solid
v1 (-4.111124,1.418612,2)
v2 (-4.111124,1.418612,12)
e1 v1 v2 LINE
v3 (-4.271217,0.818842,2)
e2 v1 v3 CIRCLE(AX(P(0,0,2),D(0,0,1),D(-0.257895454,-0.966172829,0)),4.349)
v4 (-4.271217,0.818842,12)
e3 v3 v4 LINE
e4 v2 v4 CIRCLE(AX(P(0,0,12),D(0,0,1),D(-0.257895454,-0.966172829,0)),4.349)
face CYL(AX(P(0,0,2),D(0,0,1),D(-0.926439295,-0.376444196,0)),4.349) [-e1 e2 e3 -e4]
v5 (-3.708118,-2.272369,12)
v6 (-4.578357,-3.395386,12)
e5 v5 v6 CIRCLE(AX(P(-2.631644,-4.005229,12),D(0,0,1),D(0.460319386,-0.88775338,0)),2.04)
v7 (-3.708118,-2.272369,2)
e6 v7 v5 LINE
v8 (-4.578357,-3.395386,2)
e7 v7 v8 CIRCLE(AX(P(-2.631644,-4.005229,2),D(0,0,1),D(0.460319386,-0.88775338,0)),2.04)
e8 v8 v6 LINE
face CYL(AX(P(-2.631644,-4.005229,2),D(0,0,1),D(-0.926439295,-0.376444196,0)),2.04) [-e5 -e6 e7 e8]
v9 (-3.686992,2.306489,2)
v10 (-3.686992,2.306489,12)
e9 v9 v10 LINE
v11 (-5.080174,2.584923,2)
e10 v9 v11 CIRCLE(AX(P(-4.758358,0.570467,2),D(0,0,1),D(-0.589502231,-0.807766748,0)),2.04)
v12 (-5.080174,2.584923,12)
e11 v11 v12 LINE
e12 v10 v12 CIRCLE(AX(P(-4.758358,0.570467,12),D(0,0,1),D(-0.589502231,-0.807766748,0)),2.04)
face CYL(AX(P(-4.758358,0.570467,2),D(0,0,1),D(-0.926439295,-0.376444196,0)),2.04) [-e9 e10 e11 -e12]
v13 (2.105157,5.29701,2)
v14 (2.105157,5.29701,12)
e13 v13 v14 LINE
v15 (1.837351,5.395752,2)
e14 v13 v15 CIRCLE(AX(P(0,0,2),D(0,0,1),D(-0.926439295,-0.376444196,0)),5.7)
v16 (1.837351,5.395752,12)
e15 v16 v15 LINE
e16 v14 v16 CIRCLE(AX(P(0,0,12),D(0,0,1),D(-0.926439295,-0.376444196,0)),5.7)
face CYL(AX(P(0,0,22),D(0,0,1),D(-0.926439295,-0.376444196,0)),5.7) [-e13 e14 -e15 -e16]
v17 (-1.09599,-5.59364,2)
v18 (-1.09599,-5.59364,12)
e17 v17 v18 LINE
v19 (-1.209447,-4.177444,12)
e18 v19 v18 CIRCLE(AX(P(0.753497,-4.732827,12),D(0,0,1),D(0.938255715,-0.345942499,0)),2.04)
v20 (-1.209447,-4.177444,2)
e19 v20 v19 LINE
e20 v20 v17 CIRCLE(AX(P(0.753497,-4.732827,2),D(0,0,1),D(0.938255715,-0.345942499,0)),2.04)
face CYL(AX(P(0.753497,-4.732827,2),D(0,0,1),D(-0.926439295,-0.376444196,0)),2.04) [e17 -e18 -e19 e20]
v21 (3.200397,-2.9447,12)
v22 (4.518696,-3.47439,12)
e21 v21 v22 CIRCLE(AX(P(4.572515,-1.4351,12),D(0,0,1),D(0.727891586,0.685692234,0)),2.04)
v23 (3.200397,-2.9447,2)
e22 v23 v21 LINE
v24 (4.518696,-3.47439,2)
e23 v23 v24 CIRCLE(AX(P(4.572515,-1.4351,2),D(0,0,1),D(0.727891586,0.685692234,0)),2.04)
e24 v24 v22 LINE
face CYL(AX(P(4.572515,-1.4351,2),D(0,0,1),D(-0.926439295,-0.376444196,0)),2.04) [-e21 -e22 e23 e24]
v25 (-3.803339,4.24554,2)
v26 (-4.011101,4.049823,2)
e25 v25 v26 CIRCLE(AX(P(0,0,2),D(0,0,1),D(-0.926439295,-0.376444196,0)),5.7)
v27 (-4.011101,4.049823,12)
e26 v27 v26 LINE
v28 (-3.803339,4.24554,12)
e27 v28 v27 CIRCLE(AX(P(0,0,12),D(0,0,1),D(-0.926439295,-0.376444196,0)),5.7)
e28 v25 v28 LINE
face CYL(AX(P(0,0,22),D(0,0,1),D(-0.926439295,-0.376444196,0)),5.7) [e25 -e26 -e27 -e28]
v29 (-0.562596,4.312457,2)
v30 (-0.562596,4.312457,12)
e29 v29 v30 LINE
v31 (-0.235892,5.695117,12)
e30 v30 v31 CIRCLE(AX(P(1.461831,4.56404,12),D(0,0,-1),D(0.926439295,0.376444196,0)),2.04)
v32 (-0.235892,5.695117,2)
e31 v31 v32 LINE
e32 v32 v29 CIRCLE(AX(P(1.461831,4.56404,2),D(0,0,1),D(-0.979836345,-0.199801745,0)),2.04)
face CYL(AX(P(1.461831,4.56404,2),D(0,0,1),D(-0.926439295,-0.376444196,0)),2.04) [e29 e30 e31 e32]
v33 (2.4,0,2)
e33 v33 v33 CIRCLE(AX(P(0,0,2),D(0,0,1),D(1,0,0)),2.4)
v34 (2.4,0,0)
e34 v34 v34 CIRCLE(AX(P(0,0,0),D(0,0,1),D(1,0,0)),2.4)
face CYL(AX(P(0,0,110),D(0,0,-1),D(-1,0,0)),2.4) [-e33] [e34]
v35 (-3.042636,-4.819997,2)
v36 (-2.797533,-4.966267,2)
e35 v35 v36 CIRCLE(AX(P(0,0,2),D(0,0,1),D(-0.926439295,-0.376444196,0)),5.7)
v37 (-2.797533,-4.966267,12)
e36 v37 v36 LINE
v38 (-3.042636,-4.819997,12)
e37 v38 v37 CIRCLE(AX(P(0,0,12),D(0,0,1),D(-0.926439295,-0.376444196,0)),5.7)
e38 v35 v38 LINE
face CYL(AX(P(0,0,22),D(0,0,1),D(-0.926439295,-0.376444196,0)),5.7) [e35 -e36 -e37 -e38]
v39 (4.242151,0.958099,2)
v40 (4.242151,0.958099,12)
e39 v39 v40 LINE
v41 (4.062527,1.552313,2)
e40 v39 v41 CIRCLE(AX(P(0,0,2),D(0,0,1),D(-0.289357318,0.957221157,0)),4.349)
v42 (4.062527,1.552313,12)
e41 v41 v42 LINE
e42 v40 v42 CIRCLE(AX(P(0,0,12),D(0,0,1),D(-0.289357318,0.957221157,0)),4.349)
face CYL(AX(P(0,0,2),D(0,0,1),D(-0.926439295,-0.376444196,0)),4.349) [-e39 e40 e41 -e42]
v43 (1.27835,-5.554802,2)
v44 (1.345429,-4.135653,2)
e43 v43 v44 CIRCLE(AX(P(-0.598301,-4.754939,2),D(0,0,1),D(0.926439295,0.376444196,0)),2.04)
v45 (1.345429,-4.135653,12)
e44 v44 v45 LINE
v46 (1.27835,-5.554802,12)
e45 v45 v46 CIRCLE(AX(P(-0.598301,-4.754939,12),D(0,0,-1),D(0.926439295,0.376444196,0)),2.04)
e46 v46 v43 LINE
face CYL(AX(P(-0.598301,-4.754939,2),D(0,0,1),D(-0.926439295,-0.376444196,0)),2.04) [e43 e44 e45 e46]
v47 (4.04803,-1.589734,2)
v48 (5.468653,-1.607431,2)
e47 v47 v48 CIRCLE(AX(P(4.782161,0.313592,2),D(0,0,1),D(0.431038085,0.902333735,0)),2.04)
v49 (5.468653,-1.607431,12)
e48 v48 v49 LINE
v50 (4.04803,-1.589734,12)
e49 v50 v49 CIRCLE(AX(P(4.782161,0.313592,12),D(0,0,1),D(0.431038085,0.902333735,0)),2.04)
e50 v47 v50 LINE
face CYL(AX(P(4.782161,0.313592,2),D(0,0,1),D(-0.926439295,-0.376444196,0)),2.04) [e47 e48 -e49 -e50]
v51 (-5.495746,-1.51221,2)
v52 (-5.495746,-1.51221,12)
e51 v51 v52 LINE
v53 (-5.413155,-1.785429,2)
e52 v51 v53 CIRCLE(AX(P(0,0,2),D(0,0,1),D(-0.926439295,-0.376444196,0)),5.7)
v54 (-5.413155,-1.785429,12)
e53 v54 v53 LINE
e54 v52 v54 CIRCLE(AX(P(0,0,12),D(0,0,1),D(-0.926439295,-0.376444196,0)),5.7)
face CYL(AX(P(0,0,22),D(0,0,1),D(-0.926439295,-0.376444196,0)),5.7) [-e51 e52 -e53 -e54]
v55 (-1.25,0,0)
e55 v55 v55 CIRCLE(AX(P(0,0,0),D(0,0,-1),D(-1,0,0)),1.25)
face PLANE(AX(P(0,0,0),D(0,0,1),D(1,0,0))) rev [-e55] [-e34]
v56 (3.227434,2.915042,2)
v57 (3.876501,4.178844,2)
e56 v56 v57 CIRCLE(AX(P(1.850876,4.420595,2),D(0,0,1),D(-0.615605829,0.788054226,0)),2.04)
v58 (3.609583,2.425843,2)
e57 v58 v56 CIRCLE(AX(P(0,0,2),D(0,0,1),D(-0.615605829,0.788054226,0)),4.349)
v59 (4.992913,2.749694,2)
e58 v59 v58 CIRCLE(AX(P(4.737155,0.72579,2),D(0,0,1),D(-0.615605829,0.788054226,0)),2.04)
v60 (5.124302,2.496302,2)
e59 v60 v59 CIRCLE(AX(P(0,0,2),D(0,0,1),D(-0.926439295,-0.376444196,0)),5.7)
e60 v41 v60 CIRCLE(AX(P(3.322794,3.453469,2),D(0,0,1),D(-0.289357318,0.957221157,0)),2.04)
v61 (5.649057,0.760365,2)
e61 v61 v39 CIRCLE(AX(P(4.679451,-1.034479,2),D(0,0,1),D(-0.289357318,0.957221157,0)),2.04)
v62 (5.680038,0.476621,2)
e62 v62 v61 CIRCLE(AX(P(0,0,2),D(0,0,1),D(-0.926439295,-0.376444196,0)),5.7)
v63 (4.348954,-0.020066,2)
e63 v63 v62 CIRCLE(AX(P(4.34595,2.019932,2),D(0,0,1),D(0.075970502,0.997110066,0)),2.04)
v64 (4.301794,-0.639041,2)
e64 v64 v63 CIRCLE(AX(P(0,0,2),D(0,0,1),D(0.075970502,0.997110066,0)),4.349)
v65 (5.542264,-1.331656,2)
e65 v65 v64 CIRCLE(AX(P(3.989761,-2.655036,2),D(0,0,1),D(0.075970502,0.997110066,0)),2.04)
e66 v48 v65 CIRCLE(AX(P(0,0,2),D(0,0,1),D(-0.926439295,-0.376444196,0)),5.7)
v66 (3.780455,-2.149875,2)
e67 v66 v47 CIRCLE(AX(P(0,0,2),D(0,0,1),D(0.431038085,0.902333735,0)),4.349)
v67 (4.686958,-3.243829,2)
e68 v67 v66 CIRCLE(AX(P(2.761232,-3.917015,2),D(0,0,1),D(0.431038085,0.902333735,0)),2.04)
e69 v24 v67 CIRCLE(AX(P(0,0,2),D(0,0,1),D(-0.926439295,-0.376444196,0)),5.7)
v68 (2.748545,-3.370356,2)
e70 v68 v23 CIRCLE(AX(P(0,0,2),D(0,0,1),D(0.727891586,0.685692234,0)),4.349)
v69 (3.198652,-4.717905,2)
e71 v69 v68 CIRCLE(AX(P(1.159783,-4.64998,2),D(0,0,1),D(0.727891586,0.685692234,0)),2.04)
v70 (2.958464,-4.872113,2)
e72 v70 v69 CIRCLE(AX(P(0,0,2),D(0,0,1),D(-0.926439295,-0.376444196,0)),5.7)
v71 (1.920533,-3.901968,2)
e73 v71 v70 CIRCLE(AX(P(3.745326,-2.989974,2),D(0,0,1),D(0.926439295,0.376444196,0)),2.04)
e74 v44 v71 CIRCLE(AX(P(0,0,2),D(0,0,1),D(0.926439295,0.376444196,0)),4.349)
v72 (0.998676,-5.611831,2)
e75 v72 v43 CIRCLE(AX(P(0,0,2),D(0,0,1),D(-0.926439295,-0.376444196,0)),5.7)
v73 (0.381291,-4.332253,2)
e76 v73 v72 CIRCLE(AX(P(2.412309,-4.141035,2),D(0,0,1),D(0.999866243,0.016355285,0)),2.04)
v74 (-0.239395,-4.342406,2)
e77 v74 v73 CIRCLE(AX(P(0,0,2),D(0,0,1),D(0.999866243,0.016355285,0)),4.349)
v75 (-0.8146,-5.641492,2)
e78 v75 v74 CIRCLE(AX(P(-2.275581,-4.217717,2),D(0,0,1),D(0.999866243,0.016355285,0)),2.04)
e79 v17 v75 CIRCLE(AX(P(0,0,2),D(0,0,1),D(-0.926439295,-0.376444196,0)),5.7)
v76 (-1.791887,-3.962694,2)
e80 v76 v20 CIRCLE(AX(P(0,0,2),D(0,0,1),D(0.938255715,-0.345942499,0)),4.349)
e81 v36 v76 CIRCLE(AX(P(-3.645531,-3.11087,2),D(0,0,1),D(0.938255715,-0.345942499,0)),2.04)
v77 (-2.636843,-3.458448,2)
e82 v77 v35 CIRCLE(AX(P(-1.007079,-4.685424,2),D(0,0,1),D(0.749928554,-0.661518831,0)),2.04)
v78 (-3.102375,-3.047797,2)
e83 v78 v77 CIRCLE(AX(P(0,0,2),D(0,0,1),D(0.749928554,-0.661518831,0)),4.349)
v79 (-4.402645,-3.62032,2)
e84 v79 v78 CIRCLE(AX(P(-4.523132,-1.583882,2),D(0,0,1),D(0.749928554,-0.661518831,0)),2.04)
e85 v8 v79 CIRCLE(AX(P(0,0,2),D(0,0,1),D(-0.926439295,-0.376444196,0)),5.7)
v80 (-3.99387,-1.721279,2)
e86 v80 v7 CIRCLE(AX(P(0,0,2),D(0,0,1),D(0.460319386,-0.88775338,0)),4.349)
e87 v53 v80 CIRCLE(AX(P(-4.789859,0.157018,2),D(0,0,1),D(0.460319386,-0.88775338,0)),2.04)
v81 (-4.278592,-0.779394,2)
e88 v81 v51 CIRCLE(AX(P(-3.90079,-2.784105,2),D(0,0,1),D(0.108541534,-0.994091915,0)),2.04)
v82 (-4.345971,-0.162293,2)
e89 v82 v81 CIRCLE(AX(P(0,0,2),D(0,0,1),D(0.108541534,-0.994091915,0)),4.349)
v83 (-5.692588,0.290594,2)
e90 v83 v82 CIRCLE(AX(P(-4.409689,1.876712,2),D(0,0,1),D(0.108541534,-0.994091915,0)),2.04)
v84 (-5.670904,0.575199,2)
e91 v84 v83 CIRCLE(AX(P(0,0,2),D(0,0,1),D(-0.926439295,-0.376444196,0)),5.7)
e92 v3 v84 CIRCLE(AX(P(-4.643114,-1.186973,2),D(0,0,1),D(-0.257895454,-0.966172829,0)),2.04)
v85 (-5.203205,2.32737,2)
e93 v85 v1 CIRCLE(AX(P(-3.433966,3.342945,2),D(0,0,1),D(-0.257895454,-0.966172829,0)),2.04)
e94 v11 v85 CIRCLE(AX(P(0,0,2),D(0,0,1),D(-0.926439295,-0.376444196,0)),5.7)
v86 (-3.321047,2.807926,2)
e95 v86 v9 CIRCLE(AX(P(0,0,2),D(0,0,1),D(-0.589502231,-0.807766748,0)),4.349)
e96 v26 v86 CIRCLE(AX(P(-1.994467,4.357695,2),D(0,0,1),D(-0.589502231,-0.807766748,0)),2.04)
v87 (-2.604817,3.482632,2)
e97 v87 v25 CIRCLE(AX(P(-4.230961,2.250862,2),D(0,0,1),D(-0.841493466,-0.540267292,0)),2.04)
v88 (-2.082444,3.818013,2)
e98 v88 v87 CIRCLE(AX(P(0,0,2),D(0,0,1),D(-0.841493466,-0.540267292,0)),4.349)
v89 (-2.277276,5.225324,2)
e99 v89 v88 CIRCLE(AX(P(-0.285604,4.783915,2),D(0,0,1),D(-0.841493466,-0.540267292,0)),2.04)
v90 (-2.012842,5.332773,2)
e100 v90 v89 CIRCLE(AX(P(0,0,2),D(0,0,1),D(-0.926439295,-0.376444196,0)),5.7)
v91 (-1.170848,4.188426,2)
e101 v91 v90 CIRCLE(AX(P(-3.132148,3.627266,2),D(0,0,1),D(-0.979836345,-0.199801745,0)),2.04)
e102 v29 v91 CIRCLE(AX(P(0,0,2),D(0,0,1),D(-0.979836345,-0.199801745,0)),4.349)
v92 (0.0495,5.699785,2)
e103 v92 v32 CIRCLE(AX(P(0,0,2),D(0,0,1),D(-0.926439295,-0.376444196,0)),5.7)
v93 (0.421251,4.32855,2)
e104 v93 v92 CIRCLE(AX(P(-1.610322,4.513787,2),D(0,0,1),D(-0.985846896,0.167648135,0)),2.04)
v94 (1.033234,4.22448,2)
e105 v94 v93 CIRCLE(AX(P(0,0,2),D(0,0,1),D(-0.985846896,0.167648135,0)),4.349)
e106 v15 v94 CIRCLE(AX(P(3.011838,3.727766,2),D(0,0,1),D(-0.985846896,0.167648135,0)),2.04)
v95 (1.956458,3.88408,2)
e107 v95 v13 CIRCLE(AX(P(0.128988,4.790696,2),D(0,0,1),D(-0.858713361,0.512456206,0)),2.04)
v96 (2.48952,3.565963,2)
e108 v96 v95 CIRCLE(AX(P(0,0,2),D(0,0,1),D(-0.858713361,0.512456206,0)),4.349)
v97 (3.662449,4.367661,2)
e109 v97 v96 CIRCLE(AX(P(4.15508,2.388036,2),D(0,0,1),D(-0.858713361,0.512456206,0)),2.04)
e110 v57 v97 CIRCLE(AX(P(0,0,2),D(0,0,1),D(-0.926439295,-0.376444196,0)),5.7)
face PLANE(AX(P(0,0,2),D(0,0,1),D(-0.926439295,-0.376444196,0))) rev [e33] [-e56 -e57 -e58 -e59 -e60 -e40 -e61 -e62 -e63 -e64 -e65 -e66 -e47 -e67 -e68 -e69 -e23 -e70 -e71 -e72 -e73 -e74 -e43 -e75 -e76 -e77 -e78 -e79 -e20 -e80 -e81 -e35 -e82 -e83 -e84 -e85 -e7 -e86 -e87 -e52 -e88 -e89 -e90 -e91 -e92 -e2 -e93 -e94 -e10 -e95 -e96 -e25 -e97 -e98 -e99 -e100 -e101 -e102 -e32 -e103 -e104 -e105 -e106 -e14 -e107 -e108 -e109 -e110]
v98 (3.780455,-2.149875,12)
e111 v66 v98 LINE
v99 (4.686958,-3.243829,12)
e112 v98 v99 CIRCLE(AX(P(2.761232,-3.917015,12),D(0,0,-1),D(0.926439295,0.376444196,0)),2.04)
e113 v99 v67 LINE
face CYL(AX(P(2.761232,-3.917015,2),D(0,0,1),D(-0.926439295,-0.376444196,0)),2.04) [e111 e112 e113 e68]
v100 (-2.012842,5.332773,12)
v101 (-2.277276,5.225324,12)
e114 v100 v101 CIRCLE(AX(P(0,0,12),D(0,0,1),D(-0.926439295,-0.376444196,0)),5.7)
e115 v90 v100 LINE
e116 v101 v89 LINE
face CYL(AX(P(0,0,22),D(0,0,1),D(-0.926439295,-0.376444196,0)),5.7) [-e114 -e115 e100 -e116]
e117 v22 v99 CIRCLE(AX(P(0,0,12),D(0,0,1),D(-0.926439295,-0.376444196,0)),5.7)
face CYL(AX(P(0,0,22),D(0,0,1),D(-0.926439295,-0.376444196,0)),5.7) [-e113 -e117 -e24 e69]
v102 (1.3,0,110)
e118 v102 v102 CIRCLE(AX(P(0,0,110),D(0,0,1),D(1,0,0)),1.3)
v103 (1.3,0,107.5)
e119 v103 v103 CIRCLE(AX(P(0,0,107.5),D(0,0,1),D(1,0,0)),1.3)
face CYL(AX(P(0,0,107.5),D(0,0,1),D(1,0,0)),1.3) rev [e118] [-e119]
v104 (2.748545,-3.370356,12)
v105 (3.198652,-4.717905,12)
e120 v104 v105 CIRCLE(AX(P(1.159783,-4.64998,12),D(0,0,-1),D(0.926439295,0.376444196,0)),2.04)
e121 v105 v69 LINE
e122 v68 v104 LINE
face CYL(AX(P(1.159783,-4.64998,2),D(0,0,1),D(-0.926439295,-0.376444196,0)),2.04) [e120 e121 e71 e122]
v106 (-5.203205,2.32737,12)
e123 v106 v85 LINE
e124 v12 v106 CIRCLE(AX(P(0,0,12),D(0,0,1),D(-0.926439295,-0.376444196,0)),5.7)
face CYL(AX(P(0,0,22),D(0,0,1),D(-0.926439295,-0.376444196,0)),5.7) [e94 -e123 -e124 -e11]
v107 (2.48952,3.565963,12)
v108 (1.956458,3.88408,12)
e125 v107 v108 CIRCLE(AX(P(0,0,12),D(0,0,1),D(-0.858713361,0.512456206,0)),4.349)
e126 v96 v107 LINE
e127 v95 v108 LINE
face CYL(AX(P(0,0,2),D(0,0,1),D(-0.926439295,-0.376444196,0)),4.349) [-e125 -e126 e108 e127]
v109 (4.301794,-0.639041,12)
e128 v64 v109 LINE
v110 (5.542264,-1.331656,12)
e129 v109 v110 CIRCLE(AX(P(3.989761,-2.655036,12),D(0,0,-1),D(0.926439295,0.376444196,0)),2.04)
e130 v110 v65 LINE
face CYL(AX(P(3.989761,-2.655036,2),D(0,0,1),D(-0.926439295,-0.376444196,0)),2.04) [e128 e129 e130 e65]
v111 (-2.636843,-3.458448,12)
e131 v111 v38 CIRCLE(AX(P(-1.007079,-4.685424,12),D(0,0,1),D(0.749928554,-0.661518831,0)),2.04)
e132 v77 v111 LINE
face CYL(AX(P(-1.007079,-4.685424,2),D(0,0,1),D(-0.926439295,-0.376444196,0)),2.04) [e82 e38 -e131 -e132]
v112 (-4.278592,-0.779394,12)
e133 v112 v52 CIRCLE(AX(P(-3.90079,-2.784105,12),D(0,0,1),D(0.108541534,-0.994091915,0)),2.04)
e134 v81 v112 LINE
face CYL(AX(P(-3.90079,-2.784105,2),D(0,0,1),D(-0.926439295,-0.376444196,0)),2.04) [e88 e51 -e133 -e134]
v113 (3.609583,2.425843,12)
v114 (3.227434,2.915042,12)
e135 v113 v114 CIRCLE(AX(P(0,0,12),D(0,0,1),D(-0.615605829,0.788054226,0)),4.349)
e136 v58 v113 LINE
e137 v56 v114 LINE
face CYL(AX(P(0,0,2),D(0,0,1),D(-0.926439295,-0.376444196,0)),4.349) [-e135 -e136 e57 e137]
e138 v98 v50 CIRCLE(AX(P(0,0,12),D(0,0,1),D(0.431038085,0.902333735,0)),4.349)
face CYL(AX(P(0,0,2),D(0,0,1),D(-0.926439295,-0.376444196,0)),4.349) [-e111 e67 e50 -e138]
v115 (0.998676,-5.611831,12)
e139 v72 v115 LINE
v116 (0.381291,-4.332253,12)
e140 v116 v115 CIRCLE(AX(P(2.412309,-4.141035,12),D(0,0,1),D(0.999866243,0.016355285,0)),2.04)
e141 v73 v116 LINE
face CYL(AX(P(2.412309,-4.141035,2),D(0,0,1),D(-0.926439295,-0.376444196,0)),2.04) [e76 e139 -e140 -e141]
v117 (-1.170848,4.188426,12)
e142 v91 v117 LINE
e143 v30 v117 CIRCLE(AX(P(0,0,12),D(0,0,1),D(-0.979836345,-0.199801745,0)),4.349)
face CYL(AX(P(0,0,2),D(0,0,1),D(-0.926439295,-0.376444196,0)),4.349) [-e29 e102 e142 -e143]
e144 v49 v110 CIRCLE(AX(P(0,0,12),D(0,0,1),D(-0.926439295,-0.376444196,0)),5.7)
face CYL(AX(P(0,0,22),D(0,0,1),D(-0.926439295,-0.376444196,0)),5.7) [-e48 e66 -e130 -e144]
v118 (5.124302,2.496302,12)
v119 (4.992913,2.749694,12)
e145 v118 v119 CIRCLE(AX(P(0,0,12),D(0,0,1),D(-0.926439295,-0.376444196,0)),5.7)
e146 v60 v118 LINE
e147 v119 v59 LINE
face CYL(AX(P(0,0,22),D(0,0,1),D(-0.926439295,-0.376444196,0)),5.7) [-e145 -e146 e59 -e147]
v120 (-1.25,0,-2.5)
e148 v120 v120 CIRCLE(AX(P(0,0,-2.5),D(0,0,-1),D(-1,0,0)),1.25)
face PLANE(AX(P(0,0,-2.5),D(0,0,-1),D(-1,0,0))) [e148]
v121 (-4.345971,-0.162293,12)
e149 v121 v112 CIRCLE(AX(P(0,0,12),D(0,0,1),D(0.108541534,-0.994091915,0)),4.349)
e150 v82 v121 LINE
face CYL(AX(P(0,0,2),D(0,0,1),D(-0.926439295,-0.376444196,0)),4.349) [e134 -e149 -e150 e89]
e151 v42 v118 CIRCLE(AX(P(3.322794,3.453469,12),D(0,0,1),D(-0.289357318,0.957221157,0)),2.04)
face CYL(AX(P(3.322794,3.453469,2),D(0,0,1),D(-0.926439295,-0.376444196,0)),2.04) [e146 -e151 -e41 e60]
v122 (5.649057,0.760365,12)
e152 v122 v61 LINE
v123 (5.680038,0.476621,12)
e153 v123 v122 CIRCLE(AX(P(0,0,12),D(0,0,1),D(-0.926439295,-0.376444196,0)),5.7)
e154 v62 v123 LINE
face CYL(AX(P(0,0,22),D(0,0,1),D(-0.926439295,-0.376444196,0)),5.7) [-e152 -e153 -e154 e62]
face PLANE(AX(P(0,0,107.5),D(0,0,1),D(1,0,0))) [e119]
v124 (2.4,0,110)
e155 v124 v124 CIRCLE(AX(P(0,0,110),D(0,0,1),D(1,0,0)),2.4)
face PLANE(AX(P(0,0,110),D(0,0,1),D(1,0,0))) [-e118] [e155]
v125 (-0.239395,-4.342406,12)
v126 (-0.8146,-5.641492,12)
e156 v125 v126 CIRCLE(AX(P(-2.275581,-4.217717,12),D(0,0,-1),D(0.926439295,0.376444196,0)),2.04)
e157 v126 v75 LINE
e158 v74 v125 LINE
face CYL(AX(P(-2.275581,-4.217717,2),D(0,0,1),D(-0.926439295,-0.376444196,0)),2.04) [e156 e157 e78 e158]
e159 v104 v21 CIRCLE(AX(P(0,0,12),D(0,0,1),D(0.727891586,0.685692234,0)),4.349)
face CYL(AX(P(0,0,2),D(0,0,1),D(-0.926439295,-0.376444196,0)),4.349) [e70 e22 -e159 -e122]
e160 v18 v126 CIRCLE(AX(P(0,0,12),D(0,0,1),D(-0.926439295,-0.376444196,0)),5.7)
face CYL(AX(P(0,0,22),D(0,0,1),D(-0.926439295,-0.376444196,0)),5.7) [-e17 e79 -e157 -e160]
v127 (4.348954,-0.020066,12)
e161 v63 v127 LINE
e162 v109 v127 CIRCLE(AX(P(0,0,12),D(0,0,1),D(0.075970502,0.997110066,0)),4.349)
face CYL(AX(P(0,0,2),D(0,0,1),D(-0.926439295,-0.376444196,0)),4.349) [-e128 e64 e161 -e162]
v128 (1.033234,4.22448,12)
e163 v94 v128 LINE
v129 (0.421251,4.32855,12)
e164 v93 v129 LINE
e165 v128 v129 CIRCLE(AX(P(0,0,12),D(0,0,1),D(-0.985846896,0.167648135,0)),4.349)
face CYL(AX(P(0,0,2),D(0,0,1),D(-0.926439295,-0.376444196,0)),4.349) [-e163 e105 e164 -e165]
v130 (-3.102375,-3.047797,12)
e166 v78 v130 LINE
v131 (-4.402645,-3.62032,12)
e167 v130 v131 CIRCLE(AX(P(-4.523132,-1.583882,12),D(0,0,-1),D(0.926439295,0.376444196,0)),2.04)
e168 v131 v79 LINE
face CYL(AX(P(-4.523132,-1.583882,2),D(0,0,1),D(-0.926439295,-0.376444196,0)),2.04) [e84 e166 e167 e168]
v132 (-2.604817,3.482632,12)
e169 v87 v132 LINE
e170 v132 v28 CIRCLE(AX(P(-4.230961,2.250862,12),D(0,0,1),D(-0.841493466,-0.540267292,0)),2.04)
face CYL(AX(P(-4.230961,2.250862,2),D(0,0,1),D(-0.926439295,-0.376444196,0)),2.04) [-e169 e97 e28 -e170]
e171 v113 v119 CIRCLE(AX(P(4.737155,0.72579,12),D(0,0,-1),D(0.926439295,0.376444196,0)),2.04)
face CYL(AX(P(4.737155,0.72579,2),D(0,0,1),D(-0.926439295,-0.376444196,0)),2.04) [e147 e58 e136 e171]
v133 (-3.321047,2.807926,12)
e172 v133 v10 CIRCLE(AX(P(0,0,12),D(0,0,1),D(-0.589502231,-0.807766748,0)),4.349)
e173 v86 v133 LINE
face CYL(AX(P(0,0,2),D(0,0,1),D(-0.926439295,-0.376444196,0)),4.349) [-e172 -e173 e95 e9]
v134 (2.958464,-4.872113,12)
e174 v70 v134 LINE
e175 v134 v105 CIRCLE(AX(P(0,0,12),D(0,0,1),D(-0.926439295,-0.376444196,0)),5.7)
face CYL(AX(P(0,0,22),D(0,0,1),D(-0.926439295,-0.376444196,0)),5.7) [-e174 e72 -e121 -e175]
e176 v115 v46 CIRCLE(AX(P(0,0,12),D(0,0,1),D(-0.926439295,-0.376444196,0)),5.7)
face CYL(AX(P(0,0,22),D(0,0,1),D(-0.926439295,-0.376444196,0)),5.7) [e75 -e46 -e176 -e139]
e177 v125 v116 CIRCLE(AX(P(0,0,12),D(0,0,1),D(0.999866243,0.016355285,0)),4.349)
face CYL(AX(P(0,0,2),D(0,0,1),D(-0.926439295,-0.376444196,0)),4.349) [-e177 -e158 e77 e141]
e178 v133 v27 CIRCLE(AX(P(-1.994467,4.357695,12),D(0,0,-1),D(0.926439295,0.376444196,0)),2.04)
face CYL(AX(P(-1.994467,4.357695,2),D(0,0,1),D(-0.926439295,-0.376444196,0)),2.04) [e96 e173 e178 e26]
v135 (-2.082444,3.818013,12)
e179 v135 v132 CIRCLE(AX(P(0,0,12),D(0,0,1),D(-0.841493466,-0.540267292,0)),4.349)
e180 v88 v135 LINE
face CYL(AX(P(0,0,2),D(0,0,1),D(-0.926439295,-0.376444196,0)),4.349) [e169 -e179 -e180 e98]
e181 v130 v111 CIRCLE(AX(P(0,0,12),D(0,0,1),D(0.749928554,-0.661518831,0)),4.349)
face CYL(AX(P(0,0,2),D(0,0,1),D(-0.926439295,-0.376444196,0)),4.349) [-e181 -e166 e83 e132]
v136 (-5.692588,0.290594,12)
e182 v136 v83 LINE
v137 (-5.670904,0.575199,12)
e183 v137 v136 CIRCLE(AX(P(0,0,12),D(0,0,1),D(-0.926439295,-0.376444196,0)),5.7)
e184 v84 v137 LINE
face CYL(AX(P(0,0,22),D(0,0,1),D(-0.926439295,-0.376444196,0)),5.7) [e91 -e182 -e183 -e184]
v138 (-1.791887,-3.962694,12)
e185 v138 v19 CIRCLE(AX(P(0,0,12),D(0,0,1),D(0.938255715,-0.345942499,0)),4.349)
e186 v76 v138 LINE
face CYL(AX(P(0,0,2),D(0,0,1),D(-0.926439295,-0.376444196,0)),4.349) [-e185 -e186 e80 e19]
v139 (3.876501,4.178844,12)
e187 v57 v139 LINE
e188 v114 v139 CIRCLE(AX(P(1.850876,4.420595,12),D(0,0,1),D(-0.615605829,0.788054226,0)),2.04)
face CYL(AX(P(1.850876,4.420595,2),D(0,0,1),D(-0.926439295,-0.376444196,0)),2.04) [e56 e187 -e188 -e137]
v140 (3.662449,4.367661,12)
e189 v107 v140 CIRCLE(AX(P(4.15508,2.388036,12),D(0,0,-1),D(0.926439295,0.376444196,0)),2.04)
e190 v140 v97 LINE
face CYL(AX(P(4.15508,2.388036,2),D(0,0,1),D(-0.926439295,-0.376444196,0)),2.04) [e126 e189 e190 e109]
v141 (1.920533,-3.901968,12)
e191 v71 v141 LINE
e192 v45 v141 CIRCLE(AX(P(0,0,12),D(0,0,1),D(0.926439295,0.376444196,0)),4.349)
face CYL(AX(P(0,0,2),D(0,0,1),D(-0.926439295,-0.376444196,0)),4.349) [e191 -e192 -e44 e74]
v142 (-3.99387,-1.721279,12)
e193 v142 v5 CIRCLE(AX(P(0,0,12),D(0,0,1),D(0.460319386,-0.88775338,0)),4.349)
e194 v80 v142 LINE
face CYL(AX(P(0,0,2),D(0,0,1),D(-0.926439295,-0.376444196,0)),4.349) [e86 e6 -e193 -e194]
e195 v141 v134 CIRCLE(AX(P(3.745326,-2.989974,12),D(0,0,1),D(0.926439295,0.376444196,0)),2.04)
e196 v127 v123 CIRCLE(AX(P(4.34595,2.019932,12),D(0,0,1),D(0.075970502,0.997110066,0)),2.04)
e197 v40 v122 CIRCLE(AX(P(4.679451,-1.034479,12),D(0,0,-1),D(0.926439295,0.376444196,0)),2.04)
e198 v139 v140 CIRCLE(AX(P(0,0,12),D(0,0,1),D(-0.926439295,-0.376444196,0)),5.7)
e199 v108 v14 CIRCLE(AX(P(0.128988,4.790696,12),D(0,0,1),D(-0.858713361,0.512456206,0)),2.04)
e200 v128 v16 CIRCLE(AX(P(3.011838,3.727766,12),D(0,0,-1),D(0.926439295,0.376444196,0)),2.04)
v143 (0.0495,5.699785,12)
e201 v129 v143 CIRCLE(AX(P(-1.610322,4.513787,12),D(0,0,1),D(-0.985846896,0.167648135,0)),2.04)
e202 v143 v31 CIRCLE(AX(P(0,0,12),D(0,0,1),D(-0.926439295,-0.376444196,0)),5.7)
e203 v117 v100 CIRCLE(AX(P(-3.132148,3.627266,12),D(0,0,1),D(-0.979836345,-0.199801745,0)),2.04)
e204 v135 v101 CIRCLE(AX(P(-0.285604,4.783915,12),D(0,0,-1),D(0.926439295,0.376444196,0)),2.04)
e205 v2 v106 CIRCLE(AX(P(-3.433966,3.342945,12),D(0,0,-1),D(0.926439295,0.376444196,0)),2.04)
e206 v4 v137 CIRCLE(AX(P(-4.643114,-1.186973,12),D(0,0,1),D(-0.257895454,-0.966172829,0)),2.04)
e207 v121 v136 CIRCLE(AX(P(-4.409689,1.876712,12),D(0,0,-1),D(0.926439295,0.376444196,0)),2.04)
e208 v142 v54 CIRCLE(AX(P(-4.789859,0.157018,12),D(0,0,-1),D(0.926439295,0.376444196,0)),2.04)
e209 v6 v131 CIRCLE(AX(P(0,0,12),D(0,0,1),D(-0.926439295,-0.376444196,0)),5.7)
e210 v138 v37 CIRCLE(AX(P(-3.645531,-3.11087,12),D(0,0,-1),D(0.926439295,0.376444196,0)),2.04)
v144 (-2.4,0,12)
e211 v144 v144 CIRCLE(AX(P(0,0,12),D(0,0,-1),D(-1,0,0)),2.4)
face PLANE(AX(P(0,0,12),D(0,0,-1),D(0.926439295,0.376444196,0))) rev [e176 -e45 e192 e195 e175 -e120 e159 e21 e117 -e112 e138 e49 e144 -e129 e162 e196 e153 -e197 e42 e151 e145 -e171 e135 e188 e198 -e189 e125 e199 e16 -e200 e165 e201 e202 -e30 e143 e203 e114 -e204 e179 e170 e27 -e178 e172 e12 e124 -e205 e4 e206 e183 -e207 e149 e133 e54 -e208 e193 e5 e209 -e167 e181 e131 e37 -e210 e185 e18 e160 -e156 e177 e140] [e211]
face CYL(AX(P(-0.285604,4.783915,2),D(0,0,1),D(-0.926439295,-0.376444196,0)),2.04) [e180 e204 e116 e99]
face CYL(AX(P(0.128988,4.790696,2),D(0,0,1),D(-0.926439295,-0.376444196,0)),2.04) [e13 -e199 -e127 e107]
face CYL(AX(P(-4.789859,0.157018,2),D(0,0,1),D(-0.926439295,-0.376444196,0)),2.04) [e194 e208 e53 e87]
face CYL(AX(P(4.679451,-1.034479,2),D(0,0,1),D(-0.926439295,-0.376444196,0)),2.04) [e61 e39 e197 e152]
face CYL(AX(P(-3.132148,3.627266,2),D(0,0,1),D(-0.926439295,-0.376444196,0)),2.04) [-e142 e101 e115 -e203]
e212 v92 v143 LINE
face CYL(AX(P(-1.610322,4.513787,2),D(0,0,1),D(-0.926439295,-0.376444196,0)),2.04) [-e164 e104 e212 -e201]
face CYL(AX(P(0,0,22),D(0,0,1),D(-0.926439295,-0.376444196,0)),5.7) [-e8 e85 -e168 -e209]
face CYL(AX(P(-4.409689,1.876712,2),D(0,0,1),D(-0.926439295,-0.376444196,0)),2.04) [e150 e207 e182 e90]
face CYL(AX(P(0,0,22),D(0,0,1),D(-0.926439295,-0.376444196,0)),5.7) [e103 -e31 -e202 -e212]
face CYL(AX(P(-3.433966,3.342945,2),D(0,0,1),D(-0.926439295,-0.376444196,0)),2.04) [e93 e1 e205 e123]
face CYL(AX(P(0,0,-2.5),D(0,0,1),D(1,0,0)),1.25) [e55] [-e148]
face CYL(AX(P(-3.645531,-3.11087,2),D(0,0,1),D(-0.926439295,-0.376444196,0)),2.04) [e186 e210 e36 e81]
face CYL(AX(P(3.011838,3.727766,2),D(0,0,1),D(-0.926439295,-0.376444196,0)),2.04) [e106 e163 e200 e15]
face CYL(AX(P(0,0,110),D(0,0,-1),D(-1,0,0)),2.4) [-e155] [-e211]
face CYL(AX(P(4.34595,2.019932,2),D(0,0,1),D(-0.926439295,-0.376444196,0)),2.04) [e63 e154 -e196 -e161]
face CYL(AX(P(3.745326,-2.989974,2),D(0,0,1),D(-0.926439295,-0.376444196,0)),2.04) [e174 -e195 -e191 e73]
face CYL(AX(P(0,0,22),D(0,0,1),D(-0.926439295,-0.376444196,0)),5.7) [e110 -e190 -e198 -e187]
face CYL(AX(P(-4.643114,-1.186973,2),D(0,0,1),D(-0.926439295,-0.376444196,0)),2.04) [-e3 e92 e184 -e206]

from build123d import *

# Parameters (mm, degrees)
SKETCH1_R           = 2.4
BOSS_EXTRUDE1_DEPTH = 110
SKETCH6_R           = 1.25
BOSS_EXTRUDE2_DEPTH = 2.5
SKETCH7_R           = 1.3
CUT_EXTRUDE1_DEPTH  = 2.5
JOIN1_START         = 2
JOIN1_OUTLINE_R     = 2.4
JOIN1_DEPTH         = 10


# Read off the part's stored shape, not the designer's step: Join1
with BuildPart() as part:
    # Sketch1 → Boss-Extrude1 (new body)
    with BuildSketch(Plane.XY):
        Circle(SKETCH1_R)
    extrude(amount=BOSS_EXTRUDE1_DEPTH)

    # Sketch6 → Boss-Extrude2 (add)
    with BuildSketch(Plane(origin=(0, 0, 0), x_dir=(-1, 0, 0), z_dir=(0, 0, -1))):
        Circle(SKETCH6_R)
    extrude(amount=BOSS_EXTRUDE2_DEPTH)

    # Sketch7 → Cut-Extrude1 (cut)
    with BuildSketch(Plane.XY.offset(110)):
        Circle(SKETCH7_R)
    extrude(amount=-CUT_EXTRUDE1_DEPTH, mode=Mode.SUBTRACT)

    # Join1 outline → Join1 (add)
    with BuildSketch(Plane.XY.offset(JOIN1_START)):
        with BuildLine():
            ThreePointArc((-3.708118179, -2.272368933), (-4.244159788, -2.755671749), (-4.578357083, -3.395386049))
            ThreePointArc((-4.578357083, -3.395386049), (-4.491909089, -3.508953224), (-4.402644734, -3.620320337))
            ThreePointArc((-4.402644734, -3.620320337), (-3.701059107, -3.450910109), (-3.102375311, -3.047797308))
            ThreePointArc((-3.102375311, -3.047797308), (-2.876945397, -3.261439281), (-2.636842886, -3.458447715))
            ThreePointArc((-2.636842886, -3.458447715), (-2.962097686, -4.102754733), (-3.042635922, -4.81999654))
            ThreePointArc((-3.042635922, -4.81999654), (-2.921000374, -4.89466616), (-2.7975334, -4.966266895))
            ThreePointArc((-2.7975334, -4.966266895), (-2.204522319, -4.554854601), (-1.791887445, -3.962693577))
            ThreePointArc((-1.791887445, -3.962693577), (-1.504503928, -4.080474106), (-1.20944735, -4.177443968))
            ThreePointArc((-1.20944735, -4.177443968), (-1.279987877, -4.895737955), (-1.095989921, -5.593639789))
            ThreePointArc((-1.095989921, -5.593639789), (-0.955594371, -5.619327308), (-0.814599678, -5.64149159))
            ThreePointArc((-0.814599678, -5.64149159), (-0.410252576, -5.04364074), (-0.239395251, -4.34240612))
            ThreePointArc((-0.239395251, -4.34240612), (0.071129132, -4.348418292), (0.381290753, -4.332253266))
            ThreePointArc((0.381290753, -4.332253266), (0.574991387, -5.027524639), (0.998675593, -5.61183099))
            ThreePointArc((0.998675593, -5.61183099), (1.138869946, -5.585067166), (1.278350244, -5.554801585))
            ThreePointArc((1.278350244, -5.554801585), (1.439424051, -4.851255249), (1.345428599, -4.135652655))
            ThreePointArc((1.345428599, -4.135652655), (1.63715581, -4.029084493), (1.920533427, -3.901967754))
            ThreePointArc((1.920533427, -3.901967754), (2.352314878, -4.480316262), (2.958464434, -4.872113319))
            ThreePointArc((2.958464434, -4.872113319), (3.079523566, -4.796512755), (3.198651882, -4.717904846))
            ThreePointArc((3.198651882, -4.717904846), (3.094698483, -4.003680856), (2.748544861, -3.370356383))
            ThreePointArc((2.748544861, -3.370356383), (2.982075524, -3.165600507), (3.200397419, -2.944699876))
            ThreePointArc((3.200397419, -2.944699876), (3.81194521, -3.328016348), (4.518696259, -3.474389747))
            ThreePointArc((4.518696259, -3.474389747), (4.604270465, -3.360162718), (4.686957859, -3.243828915))
            ThreePointArc((4.686957859, -3.243828915), (4.332016737, -2.615387177), (3.78045491, -2.149874805))
            ThreePointArc((3.78045491, -2.149874805), (3.924249414, -1.874584632), (4.048030006, -1.589733962))
            ThreePointArc((4.048030006, -1.589733962), (4.756751219, -1.726249384), (5.468653116, -1.607430588))
            ThreePointArc((5.468653116, -1.607430588), (5.507185124, -1.470004087), (5.542264206, -1.331655914))
            ThreePointArc((5.542264206, -1.331655914), (4.984272126, -0.873870968), (4.301793574, -0.639040722))
            ThreePointArc((4.301793574, -0.639040722), (4.336431675, -0.330395714), (4.34895371, -0.020065668))
            ThreePointArc((4.34895371, -0.020065668), (5.059131618, 0.108657124), (5.680038067, 0.47662098))
            ThreePointArc((5.680038067, 0.47662098), (5.666323915, 0.618686743), (5.649057061, 0.760364598))
            ThreePointArc((5.649057061, 0.760364598), (4.963373946, 0.985666358), (4.24215118, 0.958099352))
            ThreePointArc((4.24215118, 0.958099352), (4.16295481, 1.258414976), (4.062527116, 1.552312606))
            ThreePointArc((4.062527116, 1.552312606), (4.678248257, 1.928888885), (5.124302402, 2.496302243))
            ThreePointArc((5.124302402, 2.496302243), (5.060194264, 2.623820499), (4.992913458, 2.749693657))
            ThreePointArc((4.992913458, 2.749693657), (4.272144611, 2.71208398), (3.609582762, 2.425842799))
            ThreePointArc((3.609582762, 2.425842799), (3.42724783, 2.67726975), (3.227433725, 2.915042461))
            ThreePointArc((3.227433725, 2.915042461), (3.665541547, 3.488613515), (3.876501304, 4.178844056))
            ThreePointArc((3.876501304, 4.178844056), (3.770657338, 4.274592757), (3.662449225, 4.367661351))
            ThreePointArc((3.662449225, 4.367661351), (3.003938474, 4.072219633), (2.48952019, 3.565962734))
            ThreePointArc((2.48952019, 3.565962734), (2.228672039, 3.734544409), (1.956457525, 3.884079679))
            ThreePointArc((1.956457525, 3.884079679), (2.15778314, 4.577181558), (2.105157224, 5.297009823))
            ThreePointArc((2.105157224, 5.297009823), (1.971872245, 5.348057577), (1.83735093, 5.395752177))
            ThreePointArc((1.83735093, 5.395752177), (1.3300338, 4.882379459), (1.033234122, 4.224479642))
            ThreePointArc((1.033234122, 4.224479642), (0.72910174, 4.287448152), (0.421250895, 4.328550414))
            ThreePointArc((0.421250895, 4.328550414), (0.358604163, 5.047575869), (0.049499995, 5.699785062))
            ThreePointArc((0.049499995, 5.699785062), (-0.093225122, 5.699237587), (-0.235891789, 5.695116774))
            ThreePointArc((-0.235891789, 5.695116774), (-0.523499308, 5.033146885), (-0.562595939, 4.312457166))
            ThreePointArc((-0.562595939, 4.312457166), (-0.868937788, 4.261308264), (-1.170848002, 4.18842643))
            ThreePointArc((-1.170848002, 4.18842643), (-1.489006294, 4.836267088), (-2.012842482, 5.332772744))
            ThreePointArc((-2.012842482, 5.332772744), (-2.14573192, 5.28070398), (-2.277276015, 5.225324292))
            ThreePointArc((-2.277276015, 5.225324292), (-2.306330934, 4.504159935), (-2.082444302, 3.818013453))
            ThreePointArc((-2.082444302, 3.818013453), (-2.349622454, 3.659655082), (-2.604817389, 3.482632247))
            ThreePointArc((-2.604817389, 3.482632247), (-3.1355182, 3.971793639), (-3.803339428, 4.245539918))
            ThreePointArc((-3.803339428, 4.245539918), (-3.908445731, 4.14898204), (-4.011101496, 4.04982281))
            ThreePointArc((-4.011101496, 4.04982281), (-3.777679787, 3.366861227), (-3.321047022, 2.807925868))
            ThreePointArc((-3.321047022, 2.807925868), (-3.512977588, 2.563745203), (-3.686991754, 2.306489282))
            ThreePointArc((-3.686991754, 2.306489282), (-4.358560998, 2.570907451), (-5.080174309, 2.584923401))
            ThreePointArc((-5.080174309, 2.584923401), (-5.14330229, 2.456917084), (-5.203205494, 2.327370316))
            ThreePointArc((-5.203205494, 2.327370316), (-4.738832052, 1.774849254), (-4.111123939, 1.418612334))
            ThreePointArc((-4.111123939, 1.418612334), (-4.201885632, 1.121587328), (-4.271217452, 0.818842159))
            ThreePointArc((-4.271217452, 0.818842159), (-4.992955982, 0.822805965), (-5.6709035, 0.575198654))
            ThreePointArc((-5.6709035, 0.575198654), (-5.683527374, 0.433031862), (-5.692587758, 0.290593566))
            ThreePointArc((-5.692587758, 0.290593566), (-5.05997879, -0.056865946), (-4.345970788, -0.162292656))
            ThreePointArc((-4.345970788, -0.162292656), (-4.323305738, -0.472047131), (-4.278591565, -0.779394136))
            ThreePointArc((-4.278591565, -0.779394136), (-4.953024594, -1.036420026), (-5.49574575, -1.512209858))
            ThreePointArc((-5.49574575, -1.512209858), (-5.456160592, -1.649336712), (-5.413154501, -1.785429457))
            ThreePointArc((-5.413154501, -1.785429457), (-4.697747354, -1.880901084), (-3.993870201, -1.721279124))
            ThreePointArc((-3.993870201, -1.721279124), (-3.860839448, -2.001929008), (-3.708118179, -2.272368933))
        make_face()
        Circle(JOIN1_OUTLINE_R, mode=Mode.SUBTRACT)
    extrude(amount=JOIN1_DEPTH)


solid = part.part
